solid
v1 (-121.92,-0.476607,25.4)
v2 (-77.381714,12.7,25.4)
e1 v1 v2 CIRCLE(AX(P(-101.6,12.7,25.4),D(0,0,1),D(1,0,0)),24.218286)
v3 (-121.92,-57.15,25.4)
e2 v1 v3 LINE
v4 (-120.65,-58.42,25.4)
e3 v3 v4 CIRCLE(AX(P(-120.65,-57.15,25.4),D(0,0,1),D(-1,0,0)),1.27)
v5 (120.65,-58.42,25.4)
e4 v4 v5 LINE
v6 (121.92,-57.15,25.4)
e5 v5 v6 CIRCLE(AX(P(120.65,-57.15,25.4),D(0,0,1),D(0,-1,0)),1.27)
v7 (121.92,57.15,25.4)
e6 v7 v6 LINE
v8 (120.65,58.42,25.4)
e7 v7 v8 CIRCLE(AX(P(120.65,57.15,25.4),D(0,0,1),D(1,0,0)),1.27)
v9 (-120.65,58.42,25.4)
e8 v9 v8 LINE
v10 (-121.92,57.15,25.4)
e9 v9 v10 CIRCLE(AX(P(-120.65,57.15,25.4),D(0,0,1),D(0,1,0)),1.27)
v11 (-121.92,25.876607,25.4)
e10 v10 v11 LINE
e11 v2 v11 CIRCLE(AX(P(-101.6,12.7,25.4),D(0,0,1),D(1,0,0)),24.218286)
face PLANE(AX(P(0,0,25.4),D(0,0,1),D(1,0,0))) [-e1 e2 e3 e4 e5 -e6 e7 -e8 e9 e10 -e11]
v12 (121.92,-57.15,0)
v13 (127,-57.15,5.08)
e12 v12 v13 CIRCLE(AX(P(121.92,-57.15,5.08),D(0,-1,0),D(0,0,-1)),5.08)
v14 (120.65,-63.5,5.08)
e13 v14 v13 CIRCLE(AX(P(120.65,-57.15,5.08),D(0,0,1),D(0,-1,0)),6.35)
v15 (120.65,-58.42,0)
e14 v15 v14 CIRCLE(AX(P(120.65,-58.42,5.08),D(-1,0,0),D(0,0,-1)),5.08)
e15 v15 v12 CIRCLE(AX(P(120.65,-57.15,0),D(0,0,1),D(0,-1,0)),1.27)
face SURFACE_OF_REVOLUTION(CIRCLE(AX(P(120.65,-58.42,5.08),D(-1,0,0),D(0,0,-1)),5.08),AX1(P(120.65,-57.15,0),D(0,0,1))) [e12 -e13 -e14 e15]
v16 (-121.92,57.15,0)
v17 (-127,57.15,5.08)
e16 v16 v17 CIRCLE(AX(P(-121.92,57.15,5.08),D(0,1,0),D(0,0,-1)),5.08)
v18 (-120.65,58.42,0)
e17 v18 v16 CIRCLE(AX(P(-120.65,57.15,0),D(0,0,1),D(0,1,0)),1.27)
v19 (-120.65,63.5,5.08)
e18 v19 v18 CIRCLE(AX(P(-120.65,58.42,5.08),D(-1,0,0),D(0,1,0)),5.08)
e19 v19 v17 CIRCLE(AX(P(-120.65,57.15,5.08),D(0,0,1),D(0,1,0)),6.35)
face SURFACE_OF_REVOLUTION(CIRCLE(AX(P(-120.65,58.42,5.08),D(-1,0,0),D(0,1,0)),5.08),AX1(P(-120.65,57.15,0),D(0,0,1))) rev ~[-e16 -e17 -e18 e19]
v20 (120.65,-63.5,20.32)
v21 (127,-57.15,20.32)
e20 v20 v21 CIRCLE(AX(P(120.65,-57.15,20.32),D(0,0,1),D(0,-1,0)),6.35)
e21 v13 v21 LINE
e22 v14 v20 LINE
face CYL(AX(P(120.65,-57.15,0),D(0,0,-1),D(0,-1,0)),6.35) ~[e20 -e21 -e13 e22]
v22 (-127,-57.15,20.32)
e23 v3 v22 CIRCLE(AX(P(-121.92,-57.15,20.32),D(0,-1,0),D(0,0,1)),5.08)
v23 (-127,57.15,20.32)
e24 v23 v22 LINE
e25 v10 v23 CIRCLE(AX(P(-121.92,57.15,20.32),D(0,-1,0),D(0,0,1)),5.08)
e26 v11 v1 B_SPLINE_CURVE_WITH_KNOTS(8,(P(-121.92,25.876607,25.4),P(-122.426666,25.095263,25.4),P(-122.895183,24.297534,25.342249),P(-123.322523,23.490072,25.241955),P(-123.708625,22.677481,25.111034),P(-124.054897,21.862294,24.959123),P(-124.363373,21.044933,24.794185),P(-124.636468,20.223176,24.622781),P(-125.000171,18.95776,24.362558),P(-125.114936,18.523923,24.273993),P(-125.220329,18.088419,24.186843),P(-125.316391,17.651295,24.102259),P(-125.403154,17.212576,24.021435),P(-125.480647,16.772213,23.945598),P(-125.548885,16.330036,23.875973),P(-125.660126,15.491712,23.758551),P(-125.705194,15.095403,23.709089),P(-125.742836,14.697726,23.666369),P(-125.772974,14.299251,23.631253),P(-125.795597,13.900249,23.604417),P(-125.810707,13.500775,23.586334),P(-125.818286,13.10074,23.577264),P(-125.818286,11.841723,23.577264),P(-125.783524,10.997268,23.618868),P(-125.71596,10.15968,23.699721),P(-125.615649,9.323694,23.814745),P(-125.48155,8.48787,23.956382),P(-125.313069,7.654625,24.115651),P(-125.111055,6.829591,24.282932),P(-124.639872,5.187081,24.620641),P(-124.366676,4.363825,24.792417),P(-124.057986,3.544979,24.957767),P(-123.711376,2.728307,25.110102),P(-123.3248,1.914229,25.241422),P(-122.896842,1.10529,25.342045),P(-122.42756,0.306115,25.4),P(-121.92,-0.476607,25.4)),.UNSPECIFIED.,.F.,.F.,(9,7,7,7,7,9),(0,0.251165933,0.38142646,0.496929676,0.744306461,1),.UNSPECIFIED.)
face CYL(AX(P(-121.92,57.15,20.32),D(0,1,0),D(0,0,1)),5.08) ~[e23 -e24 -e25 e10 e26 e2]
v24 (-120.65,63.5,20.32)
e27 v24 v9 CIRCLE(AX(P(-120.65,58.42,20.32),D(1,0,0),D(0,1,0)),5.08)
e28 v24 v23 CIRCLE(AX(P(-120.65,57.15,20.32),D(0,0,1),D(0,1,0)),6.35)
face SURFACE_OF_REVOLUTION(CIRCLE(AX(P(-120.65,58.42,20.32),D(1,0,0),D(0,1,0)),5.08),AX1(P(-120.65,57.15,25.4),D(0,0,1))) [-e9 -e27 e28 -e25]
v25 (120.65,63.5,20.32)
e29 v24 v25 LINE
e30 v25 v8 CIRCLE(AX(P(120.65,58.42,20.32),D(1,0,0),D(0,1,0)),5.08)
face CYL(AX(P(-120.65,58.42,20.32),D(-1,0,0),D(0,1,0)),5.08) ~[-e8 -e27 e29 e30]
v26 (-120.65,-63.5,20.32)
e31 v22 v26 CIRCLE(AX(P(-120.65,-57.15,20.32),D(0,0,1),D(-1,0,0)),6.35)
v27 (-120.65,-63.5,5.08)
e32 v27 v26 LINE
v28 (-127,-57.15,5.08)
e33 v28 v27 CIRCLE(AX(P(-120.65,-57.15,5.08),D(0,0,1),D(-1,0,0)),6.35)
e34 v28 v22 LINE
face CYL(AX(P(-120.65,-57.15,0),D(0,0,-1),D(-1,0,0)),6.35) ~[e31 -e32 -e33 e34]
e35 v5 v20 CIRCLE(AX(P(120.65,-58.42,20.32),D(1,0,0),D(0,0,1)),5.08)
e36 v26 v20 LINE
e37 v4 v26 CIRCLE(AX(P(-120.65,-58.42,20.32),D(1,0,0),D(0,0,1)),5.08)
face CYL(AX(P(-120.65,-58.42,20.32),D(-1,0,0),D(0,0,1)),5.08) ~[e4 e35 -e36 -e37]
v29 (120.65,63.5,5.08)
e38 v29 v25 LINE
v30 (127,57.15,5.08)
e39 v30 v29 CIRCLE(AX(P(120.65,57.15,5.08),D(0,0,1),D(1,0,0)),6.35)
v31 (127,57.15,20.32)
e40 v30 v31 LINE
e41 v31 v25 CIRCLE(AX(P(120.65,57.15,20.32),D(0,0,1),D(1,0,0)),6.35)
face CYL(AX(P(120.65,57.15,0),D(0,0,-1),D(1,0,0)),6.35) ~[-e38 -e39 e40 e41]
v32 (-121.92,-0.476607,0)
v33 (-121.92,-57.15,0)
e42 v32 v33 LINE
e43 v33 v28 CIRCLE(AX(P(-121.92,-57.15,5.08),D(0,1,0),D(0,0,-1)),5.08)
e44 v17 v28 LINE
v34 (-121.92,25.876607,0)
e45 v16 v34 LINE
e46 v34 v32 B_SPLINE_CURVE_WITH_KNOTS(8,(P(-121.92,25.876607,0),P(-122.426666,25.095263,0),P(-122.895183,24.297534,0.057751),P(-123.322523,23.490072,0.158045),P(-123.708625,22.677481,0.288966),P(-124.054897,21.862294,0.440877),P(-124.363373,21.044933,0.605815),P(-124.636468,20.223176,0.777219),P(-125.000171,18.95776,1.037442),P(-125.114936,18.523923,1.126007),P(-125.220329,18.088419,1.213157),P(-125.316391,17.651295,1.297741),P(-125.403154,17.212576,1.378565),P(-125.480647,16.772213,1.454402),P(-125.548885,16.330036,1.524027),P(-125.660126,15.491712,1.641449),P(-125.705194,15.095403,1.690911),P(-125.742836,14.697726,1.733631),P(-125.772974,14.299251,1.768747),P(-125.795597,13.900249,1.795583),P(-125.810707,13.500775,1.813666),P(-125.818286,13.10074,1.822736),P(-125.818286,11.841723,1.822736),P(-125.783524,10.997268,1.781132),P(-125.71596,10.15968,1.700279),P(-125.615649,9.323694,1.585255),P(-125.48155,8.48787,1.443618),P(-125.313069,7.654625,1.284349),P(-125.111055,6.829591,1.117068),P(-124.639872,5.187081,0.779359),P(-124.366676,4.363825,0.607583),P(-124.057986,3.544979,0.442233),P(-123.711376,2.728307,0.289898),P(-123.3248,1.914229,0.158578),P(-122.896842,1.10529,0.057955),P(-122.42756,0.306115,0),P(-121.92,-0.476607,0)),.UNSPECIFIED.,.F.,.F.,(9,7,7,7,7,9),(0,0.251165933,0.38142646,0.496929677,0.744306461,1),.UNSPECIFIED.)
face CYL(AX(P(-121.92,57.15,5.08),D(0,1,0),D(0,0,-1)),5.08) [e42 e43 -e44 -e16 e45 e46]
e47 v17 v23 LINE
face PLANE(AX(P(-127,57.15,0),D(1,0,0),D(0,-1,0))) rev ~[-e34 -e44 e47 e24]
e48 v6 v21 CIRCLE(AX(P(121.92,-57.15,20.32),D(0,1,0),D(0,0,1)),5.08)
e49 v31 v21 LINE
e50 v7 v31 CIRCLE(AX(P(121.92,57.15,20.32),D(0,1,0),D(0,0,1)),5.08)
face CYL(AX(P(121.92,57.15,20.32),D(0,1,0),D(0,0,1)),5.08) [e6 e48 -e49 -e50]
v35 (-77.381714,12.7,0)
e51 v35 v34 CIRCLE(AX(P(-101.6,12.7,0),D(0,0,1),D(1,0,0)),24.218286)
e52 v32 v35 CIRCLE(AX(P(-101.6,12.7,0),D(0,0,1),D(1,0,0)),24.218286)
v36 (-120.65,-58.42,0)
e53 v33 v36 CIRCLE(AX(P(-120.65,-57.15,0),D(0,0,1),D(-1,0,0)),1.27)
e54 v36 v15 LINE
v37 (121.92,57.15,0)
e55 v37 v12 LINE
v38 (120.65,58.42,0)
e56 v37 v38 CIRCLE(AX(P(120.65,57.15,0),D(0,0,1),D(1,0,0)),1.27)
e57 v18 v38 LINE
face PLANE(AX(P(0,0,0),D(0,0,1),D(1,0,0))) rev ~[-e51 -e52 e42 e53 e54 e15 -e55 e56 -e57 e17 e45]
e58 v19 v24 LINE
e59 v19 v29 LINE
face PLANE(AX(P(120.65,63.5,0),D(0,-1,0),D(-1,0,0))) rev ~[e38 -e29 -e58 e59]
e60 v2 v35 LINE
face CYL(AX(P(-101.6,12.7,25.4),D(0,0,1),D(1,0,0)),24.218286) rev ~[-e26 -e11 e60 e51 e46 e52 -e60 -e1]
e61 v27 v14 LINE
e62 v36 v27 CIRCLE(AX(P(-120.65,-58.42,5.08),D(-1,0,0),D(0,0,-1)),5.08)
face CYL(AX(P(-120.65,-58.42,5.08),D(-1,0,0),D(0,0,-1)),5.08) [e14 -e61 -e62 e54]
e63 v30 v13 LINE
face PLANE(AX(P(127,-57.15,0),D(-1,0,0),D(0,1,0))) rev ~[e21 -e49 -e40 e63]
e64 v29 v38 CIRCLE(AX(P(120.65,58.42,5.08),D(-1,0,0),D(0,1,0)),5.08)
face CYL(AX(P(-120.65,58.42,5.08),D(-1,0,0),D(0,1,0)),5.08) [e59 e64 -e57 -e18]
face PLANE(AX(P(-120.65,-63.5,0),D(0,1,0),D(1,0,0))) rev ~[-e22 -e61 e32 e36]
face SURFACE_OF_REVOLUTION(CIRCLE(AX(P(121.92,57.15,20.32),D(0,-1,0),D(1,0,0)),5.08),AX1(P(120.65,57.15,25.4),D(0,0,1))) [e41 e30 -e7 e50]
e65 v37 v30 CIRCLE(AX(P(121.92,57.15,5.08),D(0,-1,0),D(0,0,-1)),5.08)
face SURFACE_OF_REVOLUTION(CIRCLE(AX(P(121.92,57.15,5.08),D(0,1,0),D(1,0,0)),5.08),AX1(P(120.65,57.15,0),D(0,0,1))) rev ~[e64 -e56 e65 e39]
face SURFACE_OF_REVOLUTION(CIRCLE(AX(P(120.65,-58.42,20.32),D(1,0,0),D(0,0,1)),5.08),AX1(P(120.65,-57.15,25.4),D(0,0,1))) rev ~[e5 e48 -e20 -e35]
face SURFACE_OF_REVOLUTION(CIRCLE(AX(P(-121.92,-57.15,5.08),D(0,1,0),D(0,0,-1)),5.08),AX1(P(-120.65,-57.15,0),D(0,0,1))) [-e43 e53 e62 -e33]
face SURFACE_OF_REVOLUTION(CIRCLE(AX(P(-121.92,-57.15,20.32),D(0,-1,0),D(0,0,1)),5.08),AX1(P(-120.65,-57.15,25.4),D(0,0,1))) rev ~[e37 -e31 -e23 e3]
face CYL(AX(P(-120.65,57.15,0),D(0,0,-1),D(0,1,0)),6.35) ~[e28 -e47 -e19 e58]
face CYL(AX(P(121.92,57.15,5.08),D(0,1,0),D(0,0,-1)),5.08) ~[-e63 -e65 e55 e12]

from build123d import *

# Parameters (mm, degrees)
F1_DEPTH     = 25.4
F2_R         = 24.2182856507
F3_DEPTH     = 25.401
F5_T1_DEPTH  = 114.3
F5_T3_DEPTH  = 241.3
F5_T6_ANGLE  = 90
F5_T8_ANGLE  = 90
F5_T10_ANGLE = 90
F5_T12_ANGLE = 90
F5_T14_ANGLE = 90
F5_T16_ANGLE = 90
F5_T18_ANGLE = 90
F5_T20_ANGLE = 90


# Not quite as in the source:
# - a fillet or chamfer that OpenCascade refuses, or shapes differently, is made with other operations: its cross-section is extruded or revolved along the edge and cut away or added
# - a feature of the source that left no trace in its solid (it failed there, or was rolled back) is left out


with BuildPart() as f1:
    # F0 (on Top) → F1 (new body)
    with BuildSketch(Plane.XY):
        with BuildLine():
            Line((120.65, 63.5), (-120.65, 63.5))
            ThreePointArc((-120.65, 63.5), (-125.1401280605, 61.6401280605), (-127, 57.15))
            Line((-127, 57.15), (-127, -57.15))
            ThreePointArc((-127, -57.15), (-125.1401280605, -61.6401280605), (-120.65, -63.5))
            Line((-120.65, -63.5), (120.65, -63.5))
            ThreePointArc((120.65, -63.5), (125.1401280605, -61.6401280605), (127, -57.15))
            Line((127, -57.15), (127, 57.15))
            ThreePointArc((127, 57.15), (125.1401280605, 61.6401280605), (120.65, 63.5))
        make_face()
    extrude(amount=F1_DEPTH)

    # F2 (on face) → F3 (cut, through all)
    with BuildSketch(Plane.XY.offset(25.4)):
        with Locations((-101.6, 12.7)):
            Circle(F2_R)
    extrude(amount=-F3_DEPTH, mode=Mode.SUBTRACT)

    # F5: fillet of radius 5.08 on 16 edges, made by hand

    # F5_s2 → F5_t1 (cut)
    with BuildSketch(Plane.XZ.offset(-57.15)):
        with BuildLine():
            ThreePointArc((121.92, 0), (125.5121024484, 1.4878975516), (127, 5.08))
            Line((127, 5.08), (127, 0))
            Line((127, 0), (121.92, 0))
        make_face()
        with BuildLine():
            ThreePointArc((-121.92, 0), (-125.5121024484, 1.4878975516), (-127, 5.08))
            Line((-127, 5.08), (-127, 0))
            Line((-127, 0), (-121.92, 0))
        make_face()
        with BuildLine():
            ThreePointArc((121.92, 25.4), (125.5121024484, 23.9121024484), (127, 20.32))
            Line((127, 20.32), (127, 25.4))
            Line((127, 25.4), (121.92, 25.4))
        make_face()
        with BuildLine():
            ThreePointArc((-121.92, 25.4), (-125.5121024484, 23.9121024484), (-127, 20.32))
            Line((-127, 20.32), (-127, 25.4))
            Line((-127, 25.4), (-121.92, 25.4))
        make_face()
    extrude(amount=F5_T1_DEPTH, mode=Mode.SUBTRACT)

    # F5_s4 → F5_t3 (cut)
    with BuildSketch(Plane.YZ.offset(-120.65)):
        with BuildLine():
            ThreePointArc((63.5, 5.08), (62.0121024484, 1.4878975516), (58.42, 0))
            Line((58.42, 0), (63.5, 0))
            Line((63.5, 0), (63.5, 5.08))
        make_face()
        with BuildLine():
            ThreePointArc((63.5, 20.32), (62.0121024484, 23.9121024484), (58.42, 25.4))
            Line((58.42, 25.4), (63.5, 25.4))
            Line((63.5, 25.4), (63.5, 20.32))
        make_face()
        with BuildLine():
            ThreePointArc((-58.42, 0), (-62.0121024484, 1.4878975516), (-63.5, 5.08))
            Line((-63.5, 5.08), (-63.5, 0))
            Line((-63.5, 0), (-58.42, 0))
        make_face()
        with BuildLine():
            ThreePointArc((-58.42, 25.4), (-62.0121024484, 23.9121024484), (-63.5, 20.32))
            Line((-63.5, 20.32), (-63.5, 25.4))
            Line((-63.5, 25.4), (-58.42, 25.4))
        make_face()
    extrude(amount=F5_T3_DEPTH, mode=Mode.SUBTRACT)

    # F5_s5 → F5_t6 (revolve, cut)
    with BuildSketch(Plane.XZ.offset(-57.15)):
        with BuildLine():
            ThreePointArc((127, 5.08), (125.5121024484, 1.4878975516), (121.92, 0))
            Line((121.92, 0), (127, 0))
            Line((127, 0), (127, 5.08))
        make_face()
    revolve(axis=Axis((120.65, 57.15, 0), (0, 0, 1)), revolution_arc=F5_T6_ANGLE, mode=Mode.SUBTRACT)

    # F5_s7 → F5_t8 (revolve, cut)
    with BuildSketch(Plane.XZ.offset(-57.15)):
        with BuildLine():
            ThreePointArc((127, 20.32), (125.5121024484, 23.9121024484), (121.92, 25.4))
            Line((121.92, 25.4), (127, 25.4))
            Line((127, 25.4), (127, 20.32))
        make_face()
    revolve(axis=Axis((120.65, 57.15, 25.4), (0, 0, 1)), revolution_arc=F5_T8_ANGLE, mode=Mode.SUBTRACT)

    # F5_s9 → F5_t10 (revolve, cut)
    with BuildSketch(Plane.YZ.offset(-120.65)):
        with BuildLine():
            ThreePointArc((63.5, 5.08), (62.0121024484, 1.4878975516), (58.42, 0))
            Line((58.42, 0), (63.5, 0))
            Line((63.5, 0), (63.5, 5.08))
        make_face()
    revolve(axis=Axis((-120.65, 57.15, 0), (0, 0, 1)), revolution_arc=F5_T10_ANGLE, mode=Mode.SUBTRACT)

    # F5_s11 → F5_t12 (revolve, cut)
    with BuildSketch(Plane.YZ.offset(-120.65)):
        with BuildLine():
            ThreePointArc((63.5, 20.32), (62.0121024484, 23.9121024484), (58.42, 25.4))
            Line((58.42, 25.4), (63.5, 25.4))
            Line((63.5, 25.4), (63.5, 20.32))
        make_face()
    revolve(axis=Axis((-120.65, 57.15, 25.4), (0, 0, 1)), revolution_arc=F5_T12_ANGLE, mode=Mode.SUBTRACT)

    # F5_s13 → F5_t14 (revolve, cut)
    with BuildSketch(Plane.YZ.offset(120.65)):
        with BuildLine():
            ThreePointArc((-58.42, 0), (-62.0121024484, 1.4878975516), (-63.5, 5.08))
            Line((-63.5, 5.08), (-63.5, 0))
            Line((-63.5, 0), (-58.42, 0))
        make_face()
    revolve(axis=Axis((120.65, -57.15, 0), (0, 0, 1)), revolution_arc=F5_T14_ANGLE, mode=Mode.SUBTRACT)

    # F5_s15 → F5_t16 (revolve, cut)
    with BuildSketch(Plane.XZ.offset(57.15)):
        with BuildLine():
            ThreePointArc((-121.92, 0), (-125.5121024484, 1.4878975516), (-127, 5.08))
            Line((-127, 5.08), (-127, 0))
            Line((-127, 0), (-121.92, 0))
        make_face()
    revolve(axis=Axis((-120.65, -57.15, 0), (0, 0, 1)), revolution_arc=F5_T16_ANGLE, mode=Mode.SUBTRACT)

    # F5_s17 → F5_t18 (revolve, cut)
    with BuildSketch(Plane.YZ.offset(120.65)):
        with BuildLine():
            ThreePointArc((-58.42, 25.4), (-62.0121024484, 23.9121024484), (-63.5, 20.32))
            Line((-63.5, 20.32), (-63.5, 25.4))
            Line((-63.5, 25.4), (-58.42, 25.4))
        make_face()
    revolve(axis=Axis((120.65, -57.15, 25.4), (0, 0, 1)), revolution_arc=F5_T18_ANGLE, mode=Mode.SUBTRACT)

    # F5_s19 → F5_t20 (revolve, cut)
    with BuildSketch(Plane.XZ.offset(57.15)):
        with BuildLine():
            ThreePointArc((-121.92, 25.4), (-125.5121024484, 23.9121024484), (-127, 20.32))
            Line((-127, 20.32), (-127, 25.4))
            Line((-127, 25.4), (-121.92, 25.4))
        make_face()
    revolve(axis=Axis((-120.65, -57.15, 25.4), (0, 0, 1)), revolution_arc=F5_T20_ANGLE, mode=Mode.SUBTRACT)


solid = f1.part
